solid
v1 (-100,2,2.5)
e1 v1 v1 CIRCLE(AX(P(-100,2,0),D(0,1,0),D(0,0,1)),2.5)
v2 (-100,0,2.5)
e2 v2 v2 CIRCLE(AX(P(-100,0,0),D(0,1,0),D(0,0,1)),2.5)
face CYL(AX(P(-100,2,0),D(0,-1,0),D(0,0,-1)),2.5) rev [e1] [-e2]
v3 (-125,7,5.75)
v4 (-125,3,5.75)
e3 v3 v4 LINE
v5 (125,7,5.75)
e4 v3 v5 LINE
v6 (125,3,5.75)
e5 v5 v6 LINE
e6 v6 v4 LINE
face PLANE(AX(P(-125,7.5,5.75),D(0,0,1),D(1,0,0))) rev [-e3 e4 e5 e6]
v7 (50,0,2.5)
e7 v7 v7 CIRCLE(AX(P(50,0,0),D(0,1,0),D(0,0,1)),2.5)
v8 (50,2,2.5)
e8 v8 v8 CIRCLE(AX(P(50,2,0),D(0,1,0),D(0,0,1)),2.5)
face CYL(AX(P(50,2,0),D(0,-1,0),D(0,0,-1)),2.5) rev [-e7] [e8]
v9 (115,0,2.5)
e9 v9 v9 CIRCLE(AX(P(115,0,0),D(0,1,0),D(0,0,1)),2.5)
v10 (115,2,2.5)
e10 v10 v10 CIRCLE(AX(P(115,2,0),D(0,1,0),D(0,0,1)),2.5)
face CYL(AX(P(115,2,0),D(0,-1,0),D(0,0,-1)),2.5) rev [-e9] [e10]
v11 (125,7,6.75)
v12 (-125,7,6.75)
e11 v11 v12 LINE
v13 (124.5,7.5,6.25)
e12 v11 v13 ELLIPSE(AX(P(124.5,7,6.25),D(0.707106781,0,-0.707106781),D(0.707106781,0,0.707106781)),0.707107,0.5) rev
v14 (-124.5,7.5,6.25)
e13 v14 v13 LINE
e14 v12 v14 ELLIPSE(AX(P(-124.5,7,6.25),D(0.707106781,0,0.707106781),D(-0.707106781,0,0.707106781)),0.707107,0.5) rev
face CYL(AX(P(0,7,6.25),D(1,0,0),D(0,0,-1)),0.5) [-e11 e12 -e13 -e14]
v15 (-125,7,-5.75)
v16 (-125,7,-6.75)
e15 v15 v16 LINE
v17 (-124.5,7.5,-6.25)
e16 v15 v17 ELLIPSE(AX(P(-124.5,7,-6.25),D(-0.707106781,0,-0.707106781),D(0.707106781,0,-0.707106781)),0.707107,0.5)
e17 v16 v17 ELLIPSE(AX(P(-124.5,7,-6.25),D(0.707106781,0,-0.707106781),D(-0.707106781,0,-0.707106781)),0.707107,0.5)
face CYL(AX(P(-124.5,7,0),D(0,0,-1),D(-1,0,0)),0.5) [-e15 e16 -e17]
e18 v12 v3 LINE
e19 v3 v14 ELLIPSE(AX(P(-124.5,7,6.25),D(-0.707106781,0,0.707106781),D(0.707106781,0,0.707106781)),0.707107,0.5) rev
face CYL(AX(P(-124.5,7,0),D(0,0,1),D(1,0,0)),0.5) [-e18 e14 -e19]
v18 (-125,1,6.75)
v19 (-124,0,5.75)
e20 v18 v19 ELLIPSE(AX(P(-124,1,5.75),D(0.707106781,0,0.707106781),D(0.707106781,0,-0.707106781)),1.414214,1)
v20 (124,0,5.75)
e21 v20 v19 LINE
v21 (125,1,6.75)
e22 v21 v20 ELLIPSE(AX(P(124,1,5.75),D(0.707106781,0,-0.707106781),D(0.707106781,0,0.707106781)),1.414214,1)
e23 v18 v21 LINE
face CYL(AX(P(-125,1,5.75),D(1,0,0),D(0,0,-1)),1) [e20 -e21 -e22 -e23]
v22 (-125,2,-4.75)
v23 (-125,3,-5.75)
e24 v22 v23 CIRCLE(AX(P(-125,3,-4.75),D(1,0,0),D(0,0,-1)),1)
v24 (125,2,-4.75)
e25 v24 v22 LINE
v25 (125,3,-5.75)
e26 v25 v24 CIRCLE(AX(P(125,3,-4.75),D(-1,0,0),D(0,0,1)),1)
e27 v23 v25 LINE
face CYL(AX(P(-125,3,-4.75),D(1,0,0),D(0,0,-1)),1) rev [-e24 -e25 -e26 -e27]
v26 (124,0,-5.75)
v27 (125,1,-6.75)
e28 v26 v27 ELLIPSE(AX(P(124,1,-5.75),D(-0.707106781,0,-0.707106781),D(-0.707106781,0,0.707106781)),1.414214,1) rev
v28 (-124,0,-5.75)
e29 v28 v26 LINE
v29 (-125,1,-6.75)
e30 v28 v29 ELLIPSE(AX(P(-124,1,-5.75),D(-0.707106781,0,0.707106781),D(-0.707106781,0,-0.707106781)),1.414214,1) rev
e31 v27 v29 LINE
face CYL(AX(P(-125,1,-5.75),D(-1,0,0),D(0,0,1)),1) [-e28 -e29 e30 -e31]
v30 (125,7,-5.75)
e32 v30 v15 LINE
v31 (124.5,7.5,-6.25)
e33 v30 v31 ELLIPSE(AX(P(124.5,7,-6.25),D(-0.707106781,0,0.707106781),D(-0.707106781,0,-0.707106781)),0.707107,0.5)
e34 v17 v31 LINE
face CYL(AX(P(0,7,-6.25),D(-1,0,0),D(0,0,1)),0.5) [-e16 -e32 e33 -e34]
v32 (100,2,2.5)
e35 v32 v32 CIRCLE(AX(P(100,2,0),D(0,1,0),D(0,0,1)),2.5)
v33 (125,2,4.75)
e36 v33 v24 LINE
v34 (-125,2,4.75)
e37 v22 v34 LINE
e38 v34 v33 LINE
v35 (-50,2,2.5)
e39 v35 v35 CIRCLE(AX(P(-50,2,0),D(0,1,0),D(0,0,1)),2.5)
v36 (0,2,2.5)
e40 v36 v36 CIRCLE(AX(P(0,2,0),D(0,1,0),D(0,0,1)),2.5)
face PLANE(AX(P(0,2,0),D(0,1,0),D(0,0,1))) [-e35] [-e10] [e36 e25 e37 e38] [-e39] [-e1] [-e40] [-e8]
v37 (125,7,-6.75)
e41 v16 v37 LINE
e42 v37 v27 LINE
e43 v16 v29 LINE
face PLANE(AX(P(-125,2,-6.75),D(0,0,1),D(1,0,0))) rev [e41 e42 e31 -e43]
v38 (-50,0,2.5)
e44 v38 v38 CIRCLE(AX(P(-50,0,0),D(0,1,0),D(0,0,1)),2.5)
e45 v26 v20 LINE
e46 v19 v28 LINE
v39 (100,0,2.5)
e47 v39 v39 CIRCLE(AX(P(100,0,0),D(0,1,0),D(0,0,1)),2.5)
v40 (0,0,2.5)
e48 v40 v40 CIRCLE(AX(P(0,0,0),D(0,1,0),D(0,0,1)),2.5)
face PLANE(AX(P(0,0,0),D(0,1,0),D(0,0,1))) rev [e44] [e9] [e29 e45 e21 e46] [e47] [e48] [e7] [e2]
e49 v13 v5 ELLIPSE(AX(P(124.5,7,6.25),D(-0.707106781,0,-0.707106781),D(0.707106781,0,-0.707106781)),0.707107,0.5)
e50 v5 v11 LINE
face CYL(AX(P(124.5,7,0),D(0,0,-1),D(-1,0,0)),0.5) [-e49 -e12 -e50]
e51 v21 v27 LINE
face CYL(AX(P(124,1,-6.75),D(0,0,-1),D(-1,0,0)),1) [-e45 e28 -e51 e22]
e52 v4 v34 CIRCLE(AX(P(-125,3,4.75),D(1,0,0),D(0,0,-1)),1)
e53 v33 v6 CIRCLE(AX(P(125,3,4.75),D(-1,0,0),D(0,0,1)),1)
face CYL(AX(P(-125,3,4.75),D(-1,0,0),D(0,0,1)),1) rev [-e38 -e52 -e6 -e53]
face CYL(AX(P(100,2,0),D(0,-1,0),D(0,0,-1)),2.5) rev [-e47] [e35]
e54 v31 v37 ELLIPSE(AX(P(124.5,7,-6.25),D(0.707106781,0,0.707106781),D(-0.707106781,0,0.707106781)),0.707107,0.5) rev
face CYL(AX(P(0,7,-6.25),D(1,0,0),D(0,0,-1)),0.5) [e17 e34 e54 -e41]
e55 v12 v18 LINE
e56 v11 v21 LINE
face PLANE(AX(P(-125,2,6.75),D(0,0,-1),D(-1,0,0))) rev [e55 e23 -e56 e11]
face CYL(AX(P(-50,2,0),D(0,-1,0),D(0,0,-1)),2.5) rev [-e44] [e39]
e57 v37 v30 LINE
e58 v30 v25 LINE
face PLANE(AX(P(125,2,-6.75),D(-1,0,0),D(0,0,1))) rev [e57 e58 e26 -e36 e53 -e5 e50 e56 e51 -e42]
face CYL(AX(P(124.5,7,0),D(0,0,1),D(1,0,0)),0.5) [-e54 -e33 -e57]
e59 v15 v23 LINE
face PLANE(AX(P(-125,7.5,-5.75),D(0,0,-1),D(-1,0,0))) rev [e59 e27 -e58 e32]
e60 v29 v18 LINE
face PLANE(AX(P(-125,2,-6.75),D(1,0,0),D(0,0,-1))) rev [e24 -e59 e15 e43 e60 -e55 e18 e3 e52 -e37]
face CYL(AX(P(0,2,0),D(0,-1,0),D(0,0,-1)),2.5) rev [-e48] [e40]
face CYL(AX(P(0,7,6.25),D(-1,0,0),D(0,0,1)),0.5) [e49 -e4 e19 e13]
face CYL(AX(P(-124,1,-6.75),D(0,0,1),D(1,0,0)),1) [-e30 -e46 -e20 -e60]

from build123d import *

# Parameters (mm, degrees)
SKETCH1_W           = 250
SKETCH1_H           = 13.5
SKETCH1_R           = 2.5
BOSS_EXTRUDE1_DEPTH = 2
SKETCH3_W           = 250
SKETCH3_H           = 1
BOSS_EXTRUDE2_DEPTH = 5.5
FILLET1_R           = 1
FILLET2_R           = 0.5


with BuildPart() as part:
    # Sketch1 → Boss-Extrude1 (new body)
    with BuildSketch(Plane(origin=(0, 0, 0), x_dir=(1, 0, 0), z_dir=(0, 1, 0))):
        Rectangle(SKETCH1_W, SKETCH1_H)
        with Locations(Location((0, 0, 0), (0, 0, 270))):
            Circle(SKETCH1_R, mode=Mode.SUBTRACT)
        with Locations(Location((-50, 0, 0), (0, 0, 270))):
            Circle(SKETCH1_R, mode=Mode.SUBTRACT)
        with Locations(Location((-100, 0, 0), (0, 0, 270))):
            Circle(SKETCH1_R, mode=Mode.SUBTRACT)
        with Locations(Location((50, 0, 0), (0, 0, 270))):
            Circle(SKETCH1_R, mode=Mode.SUBTRACT)
        with Locations(Location((100, 0, 0), (0, 0, 270))):
            Circle(SKETCH1_R, mode=Mode.SUBTRACT)
        with Locations(Location((115, 0, 0), (0, 0, 270))):
            Circle(SKETCH1_R, mode=Mode.SUBTRACT)
    extrude(amount=BOSS_EXTRUDE1_DEPTH)

    # Sketch3 → Boss-Extrude2 (add)
    with BuildSketch(Plane(origin=(0, 2, 0), x_dir=(1, 0, 0), z_dir=(0, 1, 0))):
        with Locations((0, 6.25)):
            Rectangle(SKETCH3_W, SKETCH3_H)
        with Locations((0, -6.25)):
            Rectangle(SKETCH3_W, SKETCH3_H)
    extrude(amount=BOSS_EXTRUDE2_DEPTH)

    # Fillet1
    fillet1_edges = [part.edges().sort_by_distance(p)[0] for p in [
        (0, 2, -5.75),
        (0, 0, 6.75),
        (0, 2, 5.75),
        (-125, 0, 0),
        (0, 0, -6.75),
        (125, 0, 0),
    ]]
    fillet(fillet1_edges, radius=FILLET1_R)

    # Fillet2
    fillet2_edges = [part.edges().sort_by_distance(p)[0] for p in [
        (-125, 7.5, -6.25),
        (0, 7.5, -5.75),
        (125, 7.5, -6.25),
        (0, 7.5, -6.75),
        (-125, 7.5, 6.25),
        (0, 7.5, 6.75),
        (125, 7.5, 6.25),
        (0, 7.5, 5.75),
    ]]
    fillet(fillet2_edges, radius=FILLET2_R - 0.0001)  # a hair under: the kernel refuses the full size


solid = part.part
